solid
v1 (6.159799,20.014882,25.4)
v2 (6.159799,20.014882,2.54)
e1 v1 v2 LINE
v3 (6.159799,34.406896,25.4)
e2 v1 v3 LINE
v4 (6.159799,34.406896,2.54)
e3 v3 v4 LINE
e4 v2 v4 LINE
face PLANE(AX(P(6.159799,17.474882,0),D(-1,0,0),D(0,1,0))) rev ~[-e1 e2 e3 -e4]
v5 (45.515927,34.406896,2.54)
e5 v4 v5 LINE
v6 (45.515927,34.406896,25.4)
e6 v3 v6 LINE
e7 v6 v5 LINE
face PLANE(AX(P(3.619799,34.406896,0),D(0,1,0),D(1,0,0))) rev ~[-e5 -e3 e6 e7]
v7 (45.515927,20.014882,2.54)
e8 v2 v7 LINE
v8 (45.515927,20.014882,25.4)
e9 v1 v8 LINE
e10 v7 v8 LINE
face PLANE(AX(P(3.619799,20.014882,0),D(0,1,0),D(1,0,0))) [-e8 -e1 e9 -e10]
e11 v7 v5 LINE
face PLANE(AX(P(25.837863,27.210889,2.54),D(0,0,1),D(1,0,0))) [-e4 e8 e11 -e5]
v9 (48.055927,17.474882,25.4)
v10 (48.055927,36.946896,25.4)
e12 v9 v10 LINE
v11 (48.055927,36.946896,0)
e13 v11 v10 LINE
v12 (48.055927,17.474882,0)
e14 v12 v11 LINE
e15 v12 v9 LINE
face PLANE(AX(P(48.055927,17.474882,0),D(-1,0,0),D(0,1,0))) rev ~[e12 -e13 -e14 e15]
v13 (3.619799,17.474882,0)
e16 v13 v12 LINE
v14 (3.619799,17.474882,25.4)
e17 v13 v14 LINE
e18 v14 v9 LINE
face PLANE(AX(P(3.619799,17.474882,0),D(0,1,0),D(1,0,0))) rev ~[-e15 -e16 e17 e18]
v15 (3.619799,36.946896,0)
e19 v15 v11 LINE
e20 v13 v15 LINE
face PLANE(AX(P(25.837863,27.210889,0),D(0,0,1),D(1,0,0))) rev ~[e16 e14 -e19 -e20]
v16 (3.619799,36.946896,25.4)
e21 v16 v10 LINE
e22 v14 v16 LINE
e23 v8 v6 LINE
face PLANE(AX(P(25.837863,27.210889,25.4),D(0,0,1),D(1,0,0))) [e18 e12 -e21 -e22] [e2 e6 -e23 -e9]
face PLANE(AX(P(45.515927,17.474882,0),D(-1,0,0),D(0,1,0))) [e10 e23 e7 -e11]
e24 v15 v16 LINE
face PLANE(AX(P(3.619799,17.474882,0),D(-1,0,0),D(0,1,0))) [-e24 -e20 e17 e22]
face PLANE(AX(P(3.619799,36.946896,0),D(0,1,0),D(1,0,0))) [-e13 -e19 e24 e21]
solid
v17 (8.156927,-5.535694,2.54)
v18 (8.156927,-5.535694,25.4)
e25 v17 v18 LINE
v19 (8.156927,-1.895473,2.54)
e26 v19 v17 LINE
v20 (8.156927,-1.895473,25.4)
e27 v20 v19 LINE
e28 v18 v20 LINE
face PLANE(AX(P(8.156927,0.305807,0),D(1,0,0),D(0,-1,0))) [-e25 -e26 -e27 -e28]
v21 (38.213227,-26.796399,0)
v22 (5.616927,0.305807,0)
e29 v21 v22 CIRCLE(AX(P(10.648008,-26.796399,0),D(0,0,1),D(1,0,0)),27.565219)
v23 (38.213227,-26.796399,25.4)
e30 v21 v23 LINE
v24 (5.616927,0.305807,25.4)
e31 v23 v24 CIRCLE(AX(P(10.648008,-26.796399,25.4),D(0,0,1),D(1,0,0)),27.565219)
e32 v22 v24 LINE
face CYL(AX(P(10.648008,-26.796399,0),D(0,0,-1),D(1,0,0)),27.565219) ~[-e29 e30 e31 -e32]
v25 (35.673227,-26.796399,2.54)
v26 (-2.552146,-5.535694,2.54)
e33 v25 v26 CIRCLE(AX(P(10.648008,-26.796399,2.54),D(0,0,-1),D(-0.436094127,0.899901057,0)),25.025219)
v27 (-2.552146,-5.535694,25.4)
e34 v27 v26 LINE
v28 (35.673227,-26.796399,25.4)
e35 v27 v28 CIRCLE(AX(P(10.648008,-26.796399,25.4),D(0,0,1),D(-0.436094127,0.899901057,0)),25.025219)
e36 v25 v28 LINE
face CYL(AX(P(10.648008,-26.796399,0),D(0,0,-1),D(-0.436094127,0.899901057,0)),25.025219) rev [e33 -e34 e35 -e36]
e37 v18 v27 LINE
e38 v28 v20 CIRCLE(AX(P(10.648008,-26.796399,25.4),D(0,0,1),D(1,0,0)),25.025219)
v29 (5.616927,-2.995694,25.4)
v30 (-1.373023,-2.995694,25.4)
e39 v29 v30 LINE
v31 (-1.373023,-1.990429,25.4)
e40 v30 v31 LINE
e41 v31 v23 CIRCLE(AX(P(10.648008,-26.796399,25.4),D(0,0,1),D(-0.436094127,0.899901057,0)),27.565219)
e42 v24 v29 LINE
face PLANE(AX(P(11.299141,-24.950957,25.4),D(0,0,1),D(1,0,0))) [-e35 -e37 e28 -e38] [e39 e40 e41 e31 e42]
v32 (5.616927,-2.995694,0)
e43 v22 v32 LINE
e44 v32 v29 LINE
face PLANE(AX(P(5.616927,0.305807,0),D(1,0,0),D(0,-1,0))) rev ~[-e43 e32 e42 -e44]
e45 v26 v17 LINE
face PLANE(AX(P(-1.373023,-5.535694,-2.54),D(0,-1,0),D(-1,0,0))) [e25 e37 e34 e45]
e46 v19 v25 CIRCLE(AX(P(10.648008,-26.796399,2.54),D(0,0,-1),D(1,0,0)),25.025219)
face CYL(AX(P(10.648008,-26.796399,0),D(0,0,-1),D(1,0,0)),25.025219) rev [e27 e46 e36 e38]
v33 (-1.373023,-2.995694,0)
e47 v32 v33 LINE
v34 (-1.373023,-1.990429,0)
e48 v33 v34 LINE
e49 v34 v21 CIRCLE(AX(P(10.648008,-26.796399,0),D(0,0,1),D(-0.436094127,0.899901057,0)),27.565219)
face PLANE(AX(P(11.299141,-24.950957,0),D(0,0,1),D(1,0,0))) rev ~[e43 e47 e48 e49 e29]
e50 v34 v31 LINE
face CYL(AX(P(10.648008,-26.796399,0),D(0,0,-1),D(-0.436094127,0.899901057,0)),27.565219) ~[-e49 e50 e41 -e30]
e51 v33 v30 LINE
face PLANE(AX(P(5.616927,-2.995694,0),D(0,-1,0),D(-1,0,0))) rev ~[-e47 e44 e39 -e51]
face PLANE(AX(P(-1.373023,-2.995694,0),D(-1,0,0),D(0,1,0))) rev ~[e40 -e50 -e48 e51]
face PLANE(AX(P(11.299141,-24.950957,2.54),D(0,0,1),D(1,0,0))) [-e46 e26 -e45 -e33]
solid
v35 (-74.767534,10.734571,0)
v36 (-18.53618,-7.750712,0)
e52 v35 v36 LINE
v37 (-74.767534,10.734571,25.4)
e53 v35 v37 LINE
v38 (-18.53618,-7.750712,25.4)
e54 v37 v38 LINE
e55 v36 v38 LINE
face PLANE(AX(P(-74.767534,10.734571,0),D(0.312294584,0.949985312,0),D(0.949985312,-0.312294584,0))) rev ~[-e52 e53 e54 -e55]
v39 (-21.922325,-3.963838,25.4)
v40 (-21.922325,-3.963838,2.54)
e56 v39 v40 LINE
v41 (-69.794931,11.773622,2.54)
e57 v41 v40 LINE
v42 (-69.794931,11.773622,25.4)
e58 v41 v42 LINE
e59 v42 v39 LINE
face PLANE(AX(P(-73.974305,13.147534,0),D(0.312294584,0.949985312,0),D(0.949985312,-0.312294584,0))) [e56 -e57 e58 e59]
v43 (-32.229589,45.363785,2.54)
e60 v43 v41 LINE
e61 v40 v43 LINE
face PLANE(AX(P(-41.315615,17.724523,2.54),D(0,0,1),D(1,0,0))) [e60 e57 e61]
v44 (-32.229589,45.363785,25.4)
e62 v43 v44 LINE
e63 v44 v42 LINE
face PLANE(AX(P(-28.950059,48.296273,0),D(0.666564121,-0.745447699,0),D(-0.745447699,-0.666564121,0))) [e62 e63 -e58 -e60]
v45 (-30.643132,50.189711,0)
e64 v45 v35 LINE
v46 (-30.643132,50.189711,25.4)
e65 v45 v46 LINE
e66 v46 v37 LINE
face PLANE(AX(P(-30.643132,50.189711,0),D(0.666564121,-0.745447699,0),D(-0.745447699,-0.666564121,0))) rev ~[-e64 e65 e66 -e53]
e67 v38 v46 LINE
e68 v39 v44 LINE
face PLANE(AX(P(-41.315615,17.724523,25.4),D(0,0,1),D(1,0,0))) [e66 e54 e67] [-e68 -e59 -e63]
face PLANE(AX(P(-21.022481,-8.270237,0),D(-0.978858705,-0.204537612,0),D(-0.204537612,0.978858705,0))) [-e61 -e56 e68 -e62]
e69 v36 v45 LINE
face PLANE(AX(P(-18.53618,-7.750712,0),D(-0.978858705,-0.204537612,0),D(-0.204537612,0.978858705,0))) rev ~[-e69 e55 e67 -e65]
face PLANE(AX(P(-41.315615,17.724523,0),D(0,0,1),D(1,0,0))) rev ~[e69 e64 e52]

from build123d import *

# Parameters (mm, degrees)
F1_DEPTH      = 25.4
F0_W          = 44.4361274131
F0_H          = 19.472014159
F2_T          = -2.54
F2_2_T        = 2.54
F2_2_T3_DEPTH = 30.48
F2_3_T        = -2.54


# Not quite as in the source:
# - a shell that OpenCascade refuses in one call is made with other operations: the cavity is built on its own and cut out


with BuildPart() as f1:
    # F0 (on Top) → F1 (new body)
    with BuildSketch(Plane.XY):
        with BuildLine():
            Line((5.6169265881, 0.3058068698), (5.6169265881, -2.9956940562))
            Line((5.6169265881, -2.9956940562), (-1.3730227947, -2.9956940562))
            Line((-1.3730227947, -2.9956940562), (-1.3730227947, -1.9904286039))
            ThreePointArc((-1.3730227947, -1.9904286039), (-3.9889147019, -50.1545199575), (38.2132269141, -26.7963986844))
            ThreePointArc((38.2132269141, -26.7963986844), (28.2712658833, -5.6005952033), (5.6169265881, 0.3058068698))
        make_face()
    extrude(amount=F1_DEPTH)

    # F2#2: shell of thickness 2.54, made by hand


with BuildPart() as f1b:
    # F0 (on Top) → F1, piece 2 (new body)
    with BuildSketch(Plane.XY):
        Polygon((-18.5361797645, -7.750711828), (-30.6431320772, 50.1897106464), (-74.7675336897, 10.734571144), align=None)
    extrude(amount=F1_DEPTH)

    # F2
    f2_openings = [f1b.faces().sort_by_distance(p)[0] for p in [
        (-41.315615, 17.724523, 25.4),
    ]]
    offset(amount=F2_T, openings=f2_openings)


with BuildPart() as f1c:
    # F0 (on Top) → F1, piece 3 (new body)
    with BuildSketch(Plane.XY):
        with Locations((25.8378628641, 27.2108893842)):
            Rectangle(F0_W, F0_H)
    extrude(amount=F1_DEPTH)

    # F2#3
    f2_3_openings = [f1c.faces().sort_by_distance(p)[0] for p in [
        (25.837863, 27.210889, 25.4),
    ]]
    offset(amount=F2_3_T, openings=f2_3_openings)


with BuildPart() as f2_2_core1:
    # F2_2_t2: copy of F1
    add(f1.part)

    # the walls: a layer under each face that stays
    f2_2_faces = [f2_2_core1.faces().sort_by_distance(p)[0] for p in [
        (5.6169265881, -1.3449435932, 12.7),
        (2.1219518967, -2.9956940562, 12.7),
        (-1.3730227947, -2.4930613301, 12.7),
        (-3.9889147019, -50.1545199575, 12.7),
        (28.2712658833, -5.6005952033, 12.7),
        (10.6480075046, -26.7963986844, 0),
    ]]
    thicken(f2_2_faces, amount=-F2_2_T, mode=Mode.SUBTRACT)

    # F2_2_s4 → F2_2_t3 (cut)
    with BuildSketch(Plane.XY.offset(-2.54)):
        Polygon((5.5915265881, -2.9702940562), (8.1569265881, -2.9956940562), (8.1569265881, -5.5356940562), (5.6169265881, -5.5356940562), align=None)
        Polygon((-1.3476227947, -2.9702940562), (-1.3730227947, -5.5356940562), (-3.9130227947, -5.5356940562), (-3.9130227947, -2.9956940562), align=None)
    extrude(amount=F2_2_T3_DEPTH, mode=Mode.SUBTRACT)


with BuildPart() as f1_1:
    add(f1.part)

    # what is left inside the walls is the cavity
    f2_2_cavity = [f2_2_core1.part.solids().sort_by_distance(p)[0] for p in [
        (-1.503628, -48.644253, 17.78),
    ]]
    add(f2_2_cavity, mode=Mode.SUBTRACT)


solid = Compound([f1b.part, f1c.part, f1_1.part])
